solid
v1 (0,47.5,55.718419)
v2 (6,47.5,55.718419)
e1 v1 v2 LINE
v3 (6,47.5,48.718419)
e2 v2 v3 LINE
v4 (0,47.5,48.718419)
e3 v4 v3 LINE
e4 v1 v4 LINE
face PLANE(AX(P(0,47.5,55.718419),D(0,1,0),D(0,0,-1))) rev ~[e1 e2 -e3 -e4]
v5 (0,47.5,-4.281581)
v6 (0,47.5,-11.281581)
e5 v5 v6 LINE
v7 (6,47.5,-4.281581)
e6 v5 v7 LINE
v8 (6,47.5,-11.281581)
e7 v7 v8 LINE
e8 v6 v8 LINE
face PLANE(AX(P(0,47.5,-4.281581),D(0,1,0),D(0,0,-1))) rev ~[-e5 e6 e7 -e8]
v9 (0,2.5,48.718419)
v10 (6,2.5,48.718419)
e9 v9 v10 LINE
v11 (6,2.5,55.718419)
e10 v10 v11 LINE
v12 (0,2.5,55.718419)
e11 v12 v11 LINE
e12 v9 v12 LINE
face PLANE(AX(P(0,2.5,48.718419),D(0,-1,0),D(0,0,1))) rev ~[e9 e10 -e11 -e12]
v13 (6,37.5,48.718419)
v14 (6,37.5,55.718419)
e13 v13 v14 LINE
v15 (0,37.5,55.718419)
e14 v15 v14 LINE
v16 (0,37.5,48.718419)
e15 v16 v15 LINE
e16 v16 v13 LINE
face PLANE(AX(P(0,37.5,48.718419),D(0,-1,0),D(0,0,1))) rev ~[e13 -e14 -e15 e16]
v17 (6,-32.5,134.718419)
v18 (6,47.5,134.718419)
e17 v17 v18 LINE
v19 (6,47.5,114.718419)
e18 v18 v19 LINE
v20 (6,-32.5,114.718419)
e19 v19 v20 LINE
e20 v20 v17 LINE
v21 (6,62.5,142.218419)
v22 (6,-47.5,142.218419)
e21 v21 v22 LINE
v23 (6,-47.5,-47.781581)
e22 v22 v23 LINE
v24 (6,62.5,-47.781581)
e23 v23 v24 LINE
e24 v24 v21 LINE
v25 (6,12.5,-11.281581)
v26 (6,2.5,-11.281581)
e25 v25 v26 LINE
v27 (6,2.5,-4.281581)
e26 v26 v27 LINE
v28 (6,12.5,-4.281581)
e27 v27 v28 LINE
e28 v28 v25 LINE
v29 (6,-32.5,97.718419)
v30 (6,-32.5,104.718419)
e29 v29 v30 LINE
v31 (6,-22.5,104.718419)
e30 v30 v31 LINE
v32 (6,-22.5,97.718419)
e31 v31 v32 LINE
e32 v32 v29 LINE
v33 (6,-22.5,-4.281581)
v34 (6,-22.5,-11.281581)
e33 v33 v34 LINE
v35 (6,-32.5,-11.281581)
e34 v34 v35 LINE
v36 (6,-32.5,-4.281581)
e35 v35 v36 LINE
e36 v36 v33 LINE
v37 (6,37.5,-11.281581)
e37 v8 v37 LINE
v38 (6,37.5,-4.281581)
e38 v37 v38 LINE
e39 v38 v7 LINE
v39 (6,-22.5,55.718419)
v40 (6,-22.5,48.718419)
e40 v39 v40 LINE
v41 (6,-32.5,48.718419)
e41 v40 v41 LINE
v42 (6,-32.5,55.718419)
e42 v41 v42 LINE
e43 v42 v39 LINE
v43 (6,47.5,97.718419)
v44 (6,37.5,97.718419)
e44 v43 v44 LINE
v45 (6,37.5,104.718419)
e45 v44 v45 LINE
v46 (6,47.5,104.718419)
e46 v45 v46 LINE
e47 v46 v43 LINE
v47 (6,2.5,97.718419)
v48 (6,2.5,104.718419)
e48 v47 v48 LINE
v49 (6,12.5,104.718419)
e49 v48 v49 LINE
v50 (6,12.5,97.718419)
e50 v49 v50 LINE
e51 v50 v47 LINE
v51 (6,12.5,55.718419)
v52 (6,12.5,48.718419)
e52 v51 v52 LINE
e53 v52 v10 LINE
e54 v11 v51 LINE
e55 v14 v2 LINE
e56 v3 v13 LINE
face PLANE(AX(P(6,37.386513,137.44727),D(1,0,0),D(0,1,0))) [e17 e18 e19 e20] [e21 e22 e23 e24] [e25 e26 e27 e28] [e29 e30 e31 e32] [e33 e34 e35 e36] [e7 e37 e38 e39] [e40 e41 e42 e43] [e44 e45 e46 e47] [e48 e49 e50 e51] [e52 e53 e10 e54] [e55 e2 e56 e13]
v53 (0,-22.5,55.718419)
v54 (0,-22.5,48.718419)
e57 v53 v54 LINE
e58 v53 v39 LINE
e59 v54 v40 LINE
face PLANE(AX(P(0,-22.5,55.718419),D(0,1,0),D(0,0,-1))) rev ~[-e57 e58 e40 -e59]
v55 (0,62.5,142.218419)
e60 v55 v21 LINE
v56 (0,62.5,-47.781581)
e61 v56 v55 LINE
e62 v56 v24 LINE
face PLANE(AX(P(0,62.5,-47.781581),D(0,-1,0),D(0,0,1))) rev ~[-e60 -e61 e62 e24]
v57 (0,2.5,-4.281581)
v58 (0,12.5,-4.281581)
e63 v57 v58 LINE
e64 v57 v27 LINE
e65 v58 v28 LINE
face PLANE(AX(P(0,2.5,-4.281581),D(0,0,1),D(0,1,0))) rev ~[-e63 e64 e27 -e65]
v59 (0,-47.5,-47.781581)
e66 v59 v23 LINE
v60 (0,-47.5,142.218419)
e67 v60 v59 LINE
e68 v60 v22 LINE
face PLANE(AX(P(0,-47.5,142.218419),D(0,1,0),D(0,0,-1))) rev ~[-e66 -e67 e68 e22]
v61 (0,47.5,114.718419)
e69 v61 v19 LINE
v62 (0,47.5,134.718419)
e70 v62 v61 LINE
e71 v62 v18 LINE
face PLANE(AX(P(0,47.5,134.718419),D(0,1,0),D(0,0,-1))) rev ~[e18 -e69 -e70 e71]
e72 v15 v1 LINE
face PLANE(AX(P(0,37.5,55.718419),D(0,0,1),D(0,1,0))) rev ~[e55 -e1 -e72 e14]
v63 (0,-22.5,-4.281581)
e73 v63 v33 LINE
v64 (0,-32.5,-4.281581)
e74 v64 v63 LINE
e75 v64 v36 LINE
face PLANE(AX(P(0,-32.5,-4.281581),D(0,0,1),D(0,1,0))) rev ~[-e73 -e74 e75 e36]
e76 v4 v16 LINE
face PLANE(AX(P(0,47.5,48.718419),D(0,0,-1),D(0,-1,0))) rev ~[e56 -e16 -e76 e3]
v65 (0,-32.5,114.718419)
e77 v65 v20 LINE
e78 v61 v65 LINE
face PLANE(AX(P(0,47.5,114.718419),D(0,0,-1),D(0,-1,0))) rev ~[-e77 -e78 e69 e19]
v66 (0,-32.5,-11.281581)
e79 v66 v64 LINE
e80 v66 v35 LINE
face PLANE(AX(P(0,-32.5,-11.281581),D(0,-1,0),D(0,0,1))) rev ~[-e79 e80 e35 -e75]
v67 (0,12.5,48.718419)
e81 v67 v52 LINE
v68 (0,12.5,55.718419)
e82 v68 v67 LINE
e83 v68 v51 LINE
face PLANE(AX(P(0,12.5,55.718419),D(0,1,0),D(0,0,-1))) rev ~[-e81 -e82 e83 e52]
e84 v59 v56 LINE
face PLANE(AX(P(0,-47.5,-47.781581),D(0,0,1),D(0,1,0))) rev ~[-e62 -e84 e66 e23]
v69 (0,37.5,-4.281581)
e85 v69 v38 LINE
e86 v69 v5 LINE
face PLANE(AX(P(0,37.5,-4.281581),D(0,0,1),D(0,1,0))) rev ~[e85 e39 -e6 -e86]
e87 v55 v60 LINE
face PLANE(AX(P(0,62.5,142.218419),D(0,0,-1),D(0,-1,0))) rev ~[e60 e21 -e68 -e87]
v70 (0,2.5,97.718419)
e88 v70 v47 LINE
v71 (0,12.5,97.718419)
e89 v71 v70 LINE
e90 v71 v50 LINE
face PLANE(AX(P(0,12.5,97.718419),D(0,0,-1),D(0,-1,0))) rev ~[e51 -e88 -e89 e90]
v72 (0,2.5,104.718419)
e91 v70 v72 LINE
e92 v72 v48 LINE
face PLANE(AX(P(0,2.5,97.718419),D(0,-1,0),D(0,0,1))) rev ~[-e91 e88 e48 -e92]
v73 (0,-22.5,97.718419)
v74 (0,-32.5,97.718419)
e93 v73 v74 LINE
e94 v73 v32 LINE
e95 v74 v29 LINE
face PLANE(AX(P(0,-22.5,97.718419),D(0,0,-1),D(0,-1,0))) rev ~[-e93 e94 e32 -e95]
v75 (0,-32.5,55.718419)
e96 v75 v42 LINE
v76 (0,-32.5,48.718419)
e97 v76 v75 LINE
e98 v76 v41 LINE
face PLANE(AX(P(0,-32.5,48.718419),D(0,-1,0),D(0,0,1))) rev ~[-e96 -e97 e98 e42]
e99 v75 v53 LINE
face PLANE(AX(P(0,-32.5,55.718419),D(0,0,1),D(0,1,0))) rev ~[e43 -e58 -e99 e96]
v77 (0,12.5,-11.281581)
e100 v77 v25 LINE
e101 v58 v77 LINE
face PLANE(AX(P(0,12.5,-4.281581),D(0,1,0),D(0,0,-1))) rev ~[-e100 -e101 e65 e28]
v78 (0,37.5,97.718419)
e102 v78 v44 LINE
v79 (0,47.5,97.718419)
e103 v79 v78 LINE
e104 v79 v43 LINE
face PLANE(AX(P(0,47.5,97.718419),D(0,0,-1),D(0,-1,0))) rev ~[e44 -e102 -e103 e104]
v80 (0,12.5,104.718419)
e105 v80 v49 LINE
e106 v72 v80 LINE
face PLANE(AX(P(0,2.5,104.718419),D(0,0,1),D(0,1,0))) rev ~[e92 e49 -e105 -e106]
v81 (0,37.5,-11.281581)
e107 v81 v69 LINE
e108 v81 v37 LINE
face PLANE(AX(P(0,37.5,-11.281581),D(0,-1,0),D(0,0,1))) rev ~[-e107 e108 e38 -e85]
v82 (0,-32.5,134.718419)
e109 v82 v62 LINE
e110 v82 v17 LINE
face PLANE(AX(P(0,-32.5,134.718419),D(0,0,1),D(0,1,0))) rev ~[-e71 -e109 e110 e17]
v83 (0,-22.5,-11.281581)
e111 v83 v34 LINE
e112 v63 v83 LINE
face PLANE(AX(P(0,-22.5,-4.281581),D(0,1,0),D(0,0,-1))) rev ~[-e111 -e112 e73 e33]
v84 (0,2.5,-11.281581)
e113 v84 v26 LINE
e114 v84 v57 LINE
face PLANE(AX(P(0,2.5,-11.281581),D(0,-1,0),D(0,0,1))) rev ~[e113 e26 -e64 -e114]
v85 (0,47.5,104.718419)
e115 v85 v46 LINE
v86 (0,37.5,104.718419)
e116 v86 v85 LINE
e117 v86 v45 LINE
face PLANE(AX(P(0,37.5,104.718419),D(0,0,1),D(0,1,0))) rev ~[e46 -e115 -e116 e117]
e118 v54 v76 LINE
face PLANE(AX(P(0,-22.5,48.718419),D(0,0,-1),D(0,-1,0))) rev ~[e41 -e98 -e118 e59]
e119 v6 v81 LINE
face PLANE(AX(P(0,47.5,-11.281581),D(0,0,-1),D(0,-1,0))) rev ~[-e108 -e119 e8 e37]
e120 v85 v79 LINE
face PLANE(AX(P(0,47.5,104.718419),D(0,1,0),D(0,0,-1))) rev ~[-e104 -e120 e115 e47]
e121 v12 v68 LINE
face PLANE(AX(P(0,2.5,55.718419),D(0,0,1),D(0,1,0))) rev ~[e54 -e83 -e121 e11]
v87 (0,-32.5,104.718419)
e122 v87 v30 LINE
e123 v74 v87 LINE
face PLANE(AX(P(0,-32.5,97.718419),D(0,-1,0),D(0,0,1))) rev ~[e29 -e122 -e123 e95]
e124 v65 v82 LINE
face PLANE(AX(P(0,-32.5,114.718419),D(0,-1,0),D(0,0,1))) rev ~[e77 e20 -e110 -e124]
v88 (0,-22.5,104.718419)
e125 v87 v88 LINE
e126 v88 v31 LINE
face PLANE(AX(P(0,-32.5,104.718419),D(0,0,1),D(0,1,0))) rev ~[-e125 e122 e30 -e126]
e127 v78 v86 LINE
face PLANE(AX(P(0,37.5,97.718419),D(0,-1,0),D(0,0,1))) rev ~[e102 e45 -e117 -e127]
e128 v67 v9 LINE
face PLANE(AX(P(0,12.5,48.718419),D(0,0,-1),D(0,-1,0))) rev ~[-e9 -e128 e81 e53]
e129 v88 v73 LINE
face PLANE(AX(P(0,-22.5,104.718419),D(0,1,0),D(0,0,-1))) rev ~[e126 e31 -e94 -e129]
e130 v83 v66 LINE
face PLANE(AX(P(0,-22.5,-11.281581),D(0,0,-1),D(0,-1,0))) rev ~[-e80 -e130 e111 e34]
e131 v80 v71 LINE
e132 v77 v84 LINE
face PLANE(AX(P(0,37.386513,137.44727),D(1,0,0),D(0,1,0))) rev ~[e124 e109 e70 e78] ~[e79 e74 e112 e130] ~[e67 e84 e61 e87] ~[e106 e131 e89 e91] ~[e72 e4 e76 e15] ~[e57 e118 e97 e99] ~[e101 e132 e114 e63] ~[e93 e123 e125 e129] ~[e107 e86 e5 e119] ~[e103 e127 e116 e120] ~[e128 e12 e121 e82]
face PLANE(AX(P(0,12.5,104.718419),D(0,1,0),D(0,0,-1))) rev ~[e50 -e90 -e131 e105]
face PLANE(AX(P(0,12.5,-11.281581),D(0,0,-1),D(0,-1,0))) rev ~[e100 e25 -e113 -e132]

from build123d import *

# Parameters (mm, degrees)
F1_DEPTH = 6


with BuildPart() as f1:
    # F0 (on Right) → F1 (new body)
    with BuildSketch(Plane.YZ):
        Polygon((62.5, 142.2184194922), (9.4337919727, 142.2184194922), (9.4337919727, 134.7184194922), (47.5, 134.7184194922), (47.5, 129.8368871212), (62.5, 129.8368871212), align=None)
        Polygon((9.4337919727, 142.2184194922), (-47.5, 142.2184194922), (-47.5, -47.7815805078), (62.5, -47.7815805078), (62.5, 129.8368871212), (47.5, 129.8368871212), (47.5, 114.7184194922), (-32.5, 114.7184194922), (-32.5, 134.7184194922), (9.4337919727, 134.7184194922), align=None)
        Polygon((-22.5, -4.2815805078), (-22.5, -7.7815805078), (-22.5, -11.2815805078), (-32.5, -11.2815805078), (-32.5, -4.2815805078), align=None, mode=Mode.SUBTRACT)
        Polygon((12.5, -4.2815805078), (12.5, -7.7815805078), (12.5, -11.2815805078), (2.5, -11.2815805078), (2.5, -7.7815805078), (2.5, -4.2815805078), align=None, mode=Mode.SUBTRACT)
        Polygon((37.5, -7.7815805078), (37.5, -4.2815805078), (47.5, -4.2815805078), (47.5, -11.2815805078), (37.5, -11.2815805078), align=None, mode=Mode.SUBTRACT)
        Polygon((-22.5, 55.7184194922), (-22.5, 52.2184194922), (-22.5, 48.7184194922), (-32.5, 48.7184194922), (-32.5, 55.7184194922), align=None, mode=Mode.SUBTRACT)
        Polygon((-22.5, 101.2184194922), (-22.5, 97.7184194922), (-32.5, 97.7184194922), (-32.5, 104.7184194922), (-22.5, 104.7184194922), align=None, mode=Mode.SUBTRACT)
        Polygon((12.5, 55.7184194922), (12.5, 52.2184194922), (12.5, 48.7184194922), (2.5, 48.7184194922), (2.5, 52.2184194922), (2.5, 55.7184194922), align=None, mode=Mode.SUBTRACT)
        Polygon((37.5, 52.2184194922), (37.5, 55.7184194922), (47.5, 55.7184194922), (47.5, 48.7184194922), (37.5, 48.7184194922), align=None, mode=Mode.SUBTRACT)
        Polygon((2.5, 97.7184194922), (2.5, 101.2184194922), (2.5, 104.7184194922), (12.5, 104.7184194922), (12.5, 101.2184194922), (12.5, 97.7184194922), align=None, mode=Mode.SUBTRACT)
        Polygon((37.5, 97.7184194922), (37.5, 101.2184194922), (37.5, 104.7184194922), (47.5, 104.7184194922), (47.5, 97.7184194922), align=None, mode=Mode.SUBTRACT)
    extrude(amount=F1_DEPTH)


solid = f1.part
